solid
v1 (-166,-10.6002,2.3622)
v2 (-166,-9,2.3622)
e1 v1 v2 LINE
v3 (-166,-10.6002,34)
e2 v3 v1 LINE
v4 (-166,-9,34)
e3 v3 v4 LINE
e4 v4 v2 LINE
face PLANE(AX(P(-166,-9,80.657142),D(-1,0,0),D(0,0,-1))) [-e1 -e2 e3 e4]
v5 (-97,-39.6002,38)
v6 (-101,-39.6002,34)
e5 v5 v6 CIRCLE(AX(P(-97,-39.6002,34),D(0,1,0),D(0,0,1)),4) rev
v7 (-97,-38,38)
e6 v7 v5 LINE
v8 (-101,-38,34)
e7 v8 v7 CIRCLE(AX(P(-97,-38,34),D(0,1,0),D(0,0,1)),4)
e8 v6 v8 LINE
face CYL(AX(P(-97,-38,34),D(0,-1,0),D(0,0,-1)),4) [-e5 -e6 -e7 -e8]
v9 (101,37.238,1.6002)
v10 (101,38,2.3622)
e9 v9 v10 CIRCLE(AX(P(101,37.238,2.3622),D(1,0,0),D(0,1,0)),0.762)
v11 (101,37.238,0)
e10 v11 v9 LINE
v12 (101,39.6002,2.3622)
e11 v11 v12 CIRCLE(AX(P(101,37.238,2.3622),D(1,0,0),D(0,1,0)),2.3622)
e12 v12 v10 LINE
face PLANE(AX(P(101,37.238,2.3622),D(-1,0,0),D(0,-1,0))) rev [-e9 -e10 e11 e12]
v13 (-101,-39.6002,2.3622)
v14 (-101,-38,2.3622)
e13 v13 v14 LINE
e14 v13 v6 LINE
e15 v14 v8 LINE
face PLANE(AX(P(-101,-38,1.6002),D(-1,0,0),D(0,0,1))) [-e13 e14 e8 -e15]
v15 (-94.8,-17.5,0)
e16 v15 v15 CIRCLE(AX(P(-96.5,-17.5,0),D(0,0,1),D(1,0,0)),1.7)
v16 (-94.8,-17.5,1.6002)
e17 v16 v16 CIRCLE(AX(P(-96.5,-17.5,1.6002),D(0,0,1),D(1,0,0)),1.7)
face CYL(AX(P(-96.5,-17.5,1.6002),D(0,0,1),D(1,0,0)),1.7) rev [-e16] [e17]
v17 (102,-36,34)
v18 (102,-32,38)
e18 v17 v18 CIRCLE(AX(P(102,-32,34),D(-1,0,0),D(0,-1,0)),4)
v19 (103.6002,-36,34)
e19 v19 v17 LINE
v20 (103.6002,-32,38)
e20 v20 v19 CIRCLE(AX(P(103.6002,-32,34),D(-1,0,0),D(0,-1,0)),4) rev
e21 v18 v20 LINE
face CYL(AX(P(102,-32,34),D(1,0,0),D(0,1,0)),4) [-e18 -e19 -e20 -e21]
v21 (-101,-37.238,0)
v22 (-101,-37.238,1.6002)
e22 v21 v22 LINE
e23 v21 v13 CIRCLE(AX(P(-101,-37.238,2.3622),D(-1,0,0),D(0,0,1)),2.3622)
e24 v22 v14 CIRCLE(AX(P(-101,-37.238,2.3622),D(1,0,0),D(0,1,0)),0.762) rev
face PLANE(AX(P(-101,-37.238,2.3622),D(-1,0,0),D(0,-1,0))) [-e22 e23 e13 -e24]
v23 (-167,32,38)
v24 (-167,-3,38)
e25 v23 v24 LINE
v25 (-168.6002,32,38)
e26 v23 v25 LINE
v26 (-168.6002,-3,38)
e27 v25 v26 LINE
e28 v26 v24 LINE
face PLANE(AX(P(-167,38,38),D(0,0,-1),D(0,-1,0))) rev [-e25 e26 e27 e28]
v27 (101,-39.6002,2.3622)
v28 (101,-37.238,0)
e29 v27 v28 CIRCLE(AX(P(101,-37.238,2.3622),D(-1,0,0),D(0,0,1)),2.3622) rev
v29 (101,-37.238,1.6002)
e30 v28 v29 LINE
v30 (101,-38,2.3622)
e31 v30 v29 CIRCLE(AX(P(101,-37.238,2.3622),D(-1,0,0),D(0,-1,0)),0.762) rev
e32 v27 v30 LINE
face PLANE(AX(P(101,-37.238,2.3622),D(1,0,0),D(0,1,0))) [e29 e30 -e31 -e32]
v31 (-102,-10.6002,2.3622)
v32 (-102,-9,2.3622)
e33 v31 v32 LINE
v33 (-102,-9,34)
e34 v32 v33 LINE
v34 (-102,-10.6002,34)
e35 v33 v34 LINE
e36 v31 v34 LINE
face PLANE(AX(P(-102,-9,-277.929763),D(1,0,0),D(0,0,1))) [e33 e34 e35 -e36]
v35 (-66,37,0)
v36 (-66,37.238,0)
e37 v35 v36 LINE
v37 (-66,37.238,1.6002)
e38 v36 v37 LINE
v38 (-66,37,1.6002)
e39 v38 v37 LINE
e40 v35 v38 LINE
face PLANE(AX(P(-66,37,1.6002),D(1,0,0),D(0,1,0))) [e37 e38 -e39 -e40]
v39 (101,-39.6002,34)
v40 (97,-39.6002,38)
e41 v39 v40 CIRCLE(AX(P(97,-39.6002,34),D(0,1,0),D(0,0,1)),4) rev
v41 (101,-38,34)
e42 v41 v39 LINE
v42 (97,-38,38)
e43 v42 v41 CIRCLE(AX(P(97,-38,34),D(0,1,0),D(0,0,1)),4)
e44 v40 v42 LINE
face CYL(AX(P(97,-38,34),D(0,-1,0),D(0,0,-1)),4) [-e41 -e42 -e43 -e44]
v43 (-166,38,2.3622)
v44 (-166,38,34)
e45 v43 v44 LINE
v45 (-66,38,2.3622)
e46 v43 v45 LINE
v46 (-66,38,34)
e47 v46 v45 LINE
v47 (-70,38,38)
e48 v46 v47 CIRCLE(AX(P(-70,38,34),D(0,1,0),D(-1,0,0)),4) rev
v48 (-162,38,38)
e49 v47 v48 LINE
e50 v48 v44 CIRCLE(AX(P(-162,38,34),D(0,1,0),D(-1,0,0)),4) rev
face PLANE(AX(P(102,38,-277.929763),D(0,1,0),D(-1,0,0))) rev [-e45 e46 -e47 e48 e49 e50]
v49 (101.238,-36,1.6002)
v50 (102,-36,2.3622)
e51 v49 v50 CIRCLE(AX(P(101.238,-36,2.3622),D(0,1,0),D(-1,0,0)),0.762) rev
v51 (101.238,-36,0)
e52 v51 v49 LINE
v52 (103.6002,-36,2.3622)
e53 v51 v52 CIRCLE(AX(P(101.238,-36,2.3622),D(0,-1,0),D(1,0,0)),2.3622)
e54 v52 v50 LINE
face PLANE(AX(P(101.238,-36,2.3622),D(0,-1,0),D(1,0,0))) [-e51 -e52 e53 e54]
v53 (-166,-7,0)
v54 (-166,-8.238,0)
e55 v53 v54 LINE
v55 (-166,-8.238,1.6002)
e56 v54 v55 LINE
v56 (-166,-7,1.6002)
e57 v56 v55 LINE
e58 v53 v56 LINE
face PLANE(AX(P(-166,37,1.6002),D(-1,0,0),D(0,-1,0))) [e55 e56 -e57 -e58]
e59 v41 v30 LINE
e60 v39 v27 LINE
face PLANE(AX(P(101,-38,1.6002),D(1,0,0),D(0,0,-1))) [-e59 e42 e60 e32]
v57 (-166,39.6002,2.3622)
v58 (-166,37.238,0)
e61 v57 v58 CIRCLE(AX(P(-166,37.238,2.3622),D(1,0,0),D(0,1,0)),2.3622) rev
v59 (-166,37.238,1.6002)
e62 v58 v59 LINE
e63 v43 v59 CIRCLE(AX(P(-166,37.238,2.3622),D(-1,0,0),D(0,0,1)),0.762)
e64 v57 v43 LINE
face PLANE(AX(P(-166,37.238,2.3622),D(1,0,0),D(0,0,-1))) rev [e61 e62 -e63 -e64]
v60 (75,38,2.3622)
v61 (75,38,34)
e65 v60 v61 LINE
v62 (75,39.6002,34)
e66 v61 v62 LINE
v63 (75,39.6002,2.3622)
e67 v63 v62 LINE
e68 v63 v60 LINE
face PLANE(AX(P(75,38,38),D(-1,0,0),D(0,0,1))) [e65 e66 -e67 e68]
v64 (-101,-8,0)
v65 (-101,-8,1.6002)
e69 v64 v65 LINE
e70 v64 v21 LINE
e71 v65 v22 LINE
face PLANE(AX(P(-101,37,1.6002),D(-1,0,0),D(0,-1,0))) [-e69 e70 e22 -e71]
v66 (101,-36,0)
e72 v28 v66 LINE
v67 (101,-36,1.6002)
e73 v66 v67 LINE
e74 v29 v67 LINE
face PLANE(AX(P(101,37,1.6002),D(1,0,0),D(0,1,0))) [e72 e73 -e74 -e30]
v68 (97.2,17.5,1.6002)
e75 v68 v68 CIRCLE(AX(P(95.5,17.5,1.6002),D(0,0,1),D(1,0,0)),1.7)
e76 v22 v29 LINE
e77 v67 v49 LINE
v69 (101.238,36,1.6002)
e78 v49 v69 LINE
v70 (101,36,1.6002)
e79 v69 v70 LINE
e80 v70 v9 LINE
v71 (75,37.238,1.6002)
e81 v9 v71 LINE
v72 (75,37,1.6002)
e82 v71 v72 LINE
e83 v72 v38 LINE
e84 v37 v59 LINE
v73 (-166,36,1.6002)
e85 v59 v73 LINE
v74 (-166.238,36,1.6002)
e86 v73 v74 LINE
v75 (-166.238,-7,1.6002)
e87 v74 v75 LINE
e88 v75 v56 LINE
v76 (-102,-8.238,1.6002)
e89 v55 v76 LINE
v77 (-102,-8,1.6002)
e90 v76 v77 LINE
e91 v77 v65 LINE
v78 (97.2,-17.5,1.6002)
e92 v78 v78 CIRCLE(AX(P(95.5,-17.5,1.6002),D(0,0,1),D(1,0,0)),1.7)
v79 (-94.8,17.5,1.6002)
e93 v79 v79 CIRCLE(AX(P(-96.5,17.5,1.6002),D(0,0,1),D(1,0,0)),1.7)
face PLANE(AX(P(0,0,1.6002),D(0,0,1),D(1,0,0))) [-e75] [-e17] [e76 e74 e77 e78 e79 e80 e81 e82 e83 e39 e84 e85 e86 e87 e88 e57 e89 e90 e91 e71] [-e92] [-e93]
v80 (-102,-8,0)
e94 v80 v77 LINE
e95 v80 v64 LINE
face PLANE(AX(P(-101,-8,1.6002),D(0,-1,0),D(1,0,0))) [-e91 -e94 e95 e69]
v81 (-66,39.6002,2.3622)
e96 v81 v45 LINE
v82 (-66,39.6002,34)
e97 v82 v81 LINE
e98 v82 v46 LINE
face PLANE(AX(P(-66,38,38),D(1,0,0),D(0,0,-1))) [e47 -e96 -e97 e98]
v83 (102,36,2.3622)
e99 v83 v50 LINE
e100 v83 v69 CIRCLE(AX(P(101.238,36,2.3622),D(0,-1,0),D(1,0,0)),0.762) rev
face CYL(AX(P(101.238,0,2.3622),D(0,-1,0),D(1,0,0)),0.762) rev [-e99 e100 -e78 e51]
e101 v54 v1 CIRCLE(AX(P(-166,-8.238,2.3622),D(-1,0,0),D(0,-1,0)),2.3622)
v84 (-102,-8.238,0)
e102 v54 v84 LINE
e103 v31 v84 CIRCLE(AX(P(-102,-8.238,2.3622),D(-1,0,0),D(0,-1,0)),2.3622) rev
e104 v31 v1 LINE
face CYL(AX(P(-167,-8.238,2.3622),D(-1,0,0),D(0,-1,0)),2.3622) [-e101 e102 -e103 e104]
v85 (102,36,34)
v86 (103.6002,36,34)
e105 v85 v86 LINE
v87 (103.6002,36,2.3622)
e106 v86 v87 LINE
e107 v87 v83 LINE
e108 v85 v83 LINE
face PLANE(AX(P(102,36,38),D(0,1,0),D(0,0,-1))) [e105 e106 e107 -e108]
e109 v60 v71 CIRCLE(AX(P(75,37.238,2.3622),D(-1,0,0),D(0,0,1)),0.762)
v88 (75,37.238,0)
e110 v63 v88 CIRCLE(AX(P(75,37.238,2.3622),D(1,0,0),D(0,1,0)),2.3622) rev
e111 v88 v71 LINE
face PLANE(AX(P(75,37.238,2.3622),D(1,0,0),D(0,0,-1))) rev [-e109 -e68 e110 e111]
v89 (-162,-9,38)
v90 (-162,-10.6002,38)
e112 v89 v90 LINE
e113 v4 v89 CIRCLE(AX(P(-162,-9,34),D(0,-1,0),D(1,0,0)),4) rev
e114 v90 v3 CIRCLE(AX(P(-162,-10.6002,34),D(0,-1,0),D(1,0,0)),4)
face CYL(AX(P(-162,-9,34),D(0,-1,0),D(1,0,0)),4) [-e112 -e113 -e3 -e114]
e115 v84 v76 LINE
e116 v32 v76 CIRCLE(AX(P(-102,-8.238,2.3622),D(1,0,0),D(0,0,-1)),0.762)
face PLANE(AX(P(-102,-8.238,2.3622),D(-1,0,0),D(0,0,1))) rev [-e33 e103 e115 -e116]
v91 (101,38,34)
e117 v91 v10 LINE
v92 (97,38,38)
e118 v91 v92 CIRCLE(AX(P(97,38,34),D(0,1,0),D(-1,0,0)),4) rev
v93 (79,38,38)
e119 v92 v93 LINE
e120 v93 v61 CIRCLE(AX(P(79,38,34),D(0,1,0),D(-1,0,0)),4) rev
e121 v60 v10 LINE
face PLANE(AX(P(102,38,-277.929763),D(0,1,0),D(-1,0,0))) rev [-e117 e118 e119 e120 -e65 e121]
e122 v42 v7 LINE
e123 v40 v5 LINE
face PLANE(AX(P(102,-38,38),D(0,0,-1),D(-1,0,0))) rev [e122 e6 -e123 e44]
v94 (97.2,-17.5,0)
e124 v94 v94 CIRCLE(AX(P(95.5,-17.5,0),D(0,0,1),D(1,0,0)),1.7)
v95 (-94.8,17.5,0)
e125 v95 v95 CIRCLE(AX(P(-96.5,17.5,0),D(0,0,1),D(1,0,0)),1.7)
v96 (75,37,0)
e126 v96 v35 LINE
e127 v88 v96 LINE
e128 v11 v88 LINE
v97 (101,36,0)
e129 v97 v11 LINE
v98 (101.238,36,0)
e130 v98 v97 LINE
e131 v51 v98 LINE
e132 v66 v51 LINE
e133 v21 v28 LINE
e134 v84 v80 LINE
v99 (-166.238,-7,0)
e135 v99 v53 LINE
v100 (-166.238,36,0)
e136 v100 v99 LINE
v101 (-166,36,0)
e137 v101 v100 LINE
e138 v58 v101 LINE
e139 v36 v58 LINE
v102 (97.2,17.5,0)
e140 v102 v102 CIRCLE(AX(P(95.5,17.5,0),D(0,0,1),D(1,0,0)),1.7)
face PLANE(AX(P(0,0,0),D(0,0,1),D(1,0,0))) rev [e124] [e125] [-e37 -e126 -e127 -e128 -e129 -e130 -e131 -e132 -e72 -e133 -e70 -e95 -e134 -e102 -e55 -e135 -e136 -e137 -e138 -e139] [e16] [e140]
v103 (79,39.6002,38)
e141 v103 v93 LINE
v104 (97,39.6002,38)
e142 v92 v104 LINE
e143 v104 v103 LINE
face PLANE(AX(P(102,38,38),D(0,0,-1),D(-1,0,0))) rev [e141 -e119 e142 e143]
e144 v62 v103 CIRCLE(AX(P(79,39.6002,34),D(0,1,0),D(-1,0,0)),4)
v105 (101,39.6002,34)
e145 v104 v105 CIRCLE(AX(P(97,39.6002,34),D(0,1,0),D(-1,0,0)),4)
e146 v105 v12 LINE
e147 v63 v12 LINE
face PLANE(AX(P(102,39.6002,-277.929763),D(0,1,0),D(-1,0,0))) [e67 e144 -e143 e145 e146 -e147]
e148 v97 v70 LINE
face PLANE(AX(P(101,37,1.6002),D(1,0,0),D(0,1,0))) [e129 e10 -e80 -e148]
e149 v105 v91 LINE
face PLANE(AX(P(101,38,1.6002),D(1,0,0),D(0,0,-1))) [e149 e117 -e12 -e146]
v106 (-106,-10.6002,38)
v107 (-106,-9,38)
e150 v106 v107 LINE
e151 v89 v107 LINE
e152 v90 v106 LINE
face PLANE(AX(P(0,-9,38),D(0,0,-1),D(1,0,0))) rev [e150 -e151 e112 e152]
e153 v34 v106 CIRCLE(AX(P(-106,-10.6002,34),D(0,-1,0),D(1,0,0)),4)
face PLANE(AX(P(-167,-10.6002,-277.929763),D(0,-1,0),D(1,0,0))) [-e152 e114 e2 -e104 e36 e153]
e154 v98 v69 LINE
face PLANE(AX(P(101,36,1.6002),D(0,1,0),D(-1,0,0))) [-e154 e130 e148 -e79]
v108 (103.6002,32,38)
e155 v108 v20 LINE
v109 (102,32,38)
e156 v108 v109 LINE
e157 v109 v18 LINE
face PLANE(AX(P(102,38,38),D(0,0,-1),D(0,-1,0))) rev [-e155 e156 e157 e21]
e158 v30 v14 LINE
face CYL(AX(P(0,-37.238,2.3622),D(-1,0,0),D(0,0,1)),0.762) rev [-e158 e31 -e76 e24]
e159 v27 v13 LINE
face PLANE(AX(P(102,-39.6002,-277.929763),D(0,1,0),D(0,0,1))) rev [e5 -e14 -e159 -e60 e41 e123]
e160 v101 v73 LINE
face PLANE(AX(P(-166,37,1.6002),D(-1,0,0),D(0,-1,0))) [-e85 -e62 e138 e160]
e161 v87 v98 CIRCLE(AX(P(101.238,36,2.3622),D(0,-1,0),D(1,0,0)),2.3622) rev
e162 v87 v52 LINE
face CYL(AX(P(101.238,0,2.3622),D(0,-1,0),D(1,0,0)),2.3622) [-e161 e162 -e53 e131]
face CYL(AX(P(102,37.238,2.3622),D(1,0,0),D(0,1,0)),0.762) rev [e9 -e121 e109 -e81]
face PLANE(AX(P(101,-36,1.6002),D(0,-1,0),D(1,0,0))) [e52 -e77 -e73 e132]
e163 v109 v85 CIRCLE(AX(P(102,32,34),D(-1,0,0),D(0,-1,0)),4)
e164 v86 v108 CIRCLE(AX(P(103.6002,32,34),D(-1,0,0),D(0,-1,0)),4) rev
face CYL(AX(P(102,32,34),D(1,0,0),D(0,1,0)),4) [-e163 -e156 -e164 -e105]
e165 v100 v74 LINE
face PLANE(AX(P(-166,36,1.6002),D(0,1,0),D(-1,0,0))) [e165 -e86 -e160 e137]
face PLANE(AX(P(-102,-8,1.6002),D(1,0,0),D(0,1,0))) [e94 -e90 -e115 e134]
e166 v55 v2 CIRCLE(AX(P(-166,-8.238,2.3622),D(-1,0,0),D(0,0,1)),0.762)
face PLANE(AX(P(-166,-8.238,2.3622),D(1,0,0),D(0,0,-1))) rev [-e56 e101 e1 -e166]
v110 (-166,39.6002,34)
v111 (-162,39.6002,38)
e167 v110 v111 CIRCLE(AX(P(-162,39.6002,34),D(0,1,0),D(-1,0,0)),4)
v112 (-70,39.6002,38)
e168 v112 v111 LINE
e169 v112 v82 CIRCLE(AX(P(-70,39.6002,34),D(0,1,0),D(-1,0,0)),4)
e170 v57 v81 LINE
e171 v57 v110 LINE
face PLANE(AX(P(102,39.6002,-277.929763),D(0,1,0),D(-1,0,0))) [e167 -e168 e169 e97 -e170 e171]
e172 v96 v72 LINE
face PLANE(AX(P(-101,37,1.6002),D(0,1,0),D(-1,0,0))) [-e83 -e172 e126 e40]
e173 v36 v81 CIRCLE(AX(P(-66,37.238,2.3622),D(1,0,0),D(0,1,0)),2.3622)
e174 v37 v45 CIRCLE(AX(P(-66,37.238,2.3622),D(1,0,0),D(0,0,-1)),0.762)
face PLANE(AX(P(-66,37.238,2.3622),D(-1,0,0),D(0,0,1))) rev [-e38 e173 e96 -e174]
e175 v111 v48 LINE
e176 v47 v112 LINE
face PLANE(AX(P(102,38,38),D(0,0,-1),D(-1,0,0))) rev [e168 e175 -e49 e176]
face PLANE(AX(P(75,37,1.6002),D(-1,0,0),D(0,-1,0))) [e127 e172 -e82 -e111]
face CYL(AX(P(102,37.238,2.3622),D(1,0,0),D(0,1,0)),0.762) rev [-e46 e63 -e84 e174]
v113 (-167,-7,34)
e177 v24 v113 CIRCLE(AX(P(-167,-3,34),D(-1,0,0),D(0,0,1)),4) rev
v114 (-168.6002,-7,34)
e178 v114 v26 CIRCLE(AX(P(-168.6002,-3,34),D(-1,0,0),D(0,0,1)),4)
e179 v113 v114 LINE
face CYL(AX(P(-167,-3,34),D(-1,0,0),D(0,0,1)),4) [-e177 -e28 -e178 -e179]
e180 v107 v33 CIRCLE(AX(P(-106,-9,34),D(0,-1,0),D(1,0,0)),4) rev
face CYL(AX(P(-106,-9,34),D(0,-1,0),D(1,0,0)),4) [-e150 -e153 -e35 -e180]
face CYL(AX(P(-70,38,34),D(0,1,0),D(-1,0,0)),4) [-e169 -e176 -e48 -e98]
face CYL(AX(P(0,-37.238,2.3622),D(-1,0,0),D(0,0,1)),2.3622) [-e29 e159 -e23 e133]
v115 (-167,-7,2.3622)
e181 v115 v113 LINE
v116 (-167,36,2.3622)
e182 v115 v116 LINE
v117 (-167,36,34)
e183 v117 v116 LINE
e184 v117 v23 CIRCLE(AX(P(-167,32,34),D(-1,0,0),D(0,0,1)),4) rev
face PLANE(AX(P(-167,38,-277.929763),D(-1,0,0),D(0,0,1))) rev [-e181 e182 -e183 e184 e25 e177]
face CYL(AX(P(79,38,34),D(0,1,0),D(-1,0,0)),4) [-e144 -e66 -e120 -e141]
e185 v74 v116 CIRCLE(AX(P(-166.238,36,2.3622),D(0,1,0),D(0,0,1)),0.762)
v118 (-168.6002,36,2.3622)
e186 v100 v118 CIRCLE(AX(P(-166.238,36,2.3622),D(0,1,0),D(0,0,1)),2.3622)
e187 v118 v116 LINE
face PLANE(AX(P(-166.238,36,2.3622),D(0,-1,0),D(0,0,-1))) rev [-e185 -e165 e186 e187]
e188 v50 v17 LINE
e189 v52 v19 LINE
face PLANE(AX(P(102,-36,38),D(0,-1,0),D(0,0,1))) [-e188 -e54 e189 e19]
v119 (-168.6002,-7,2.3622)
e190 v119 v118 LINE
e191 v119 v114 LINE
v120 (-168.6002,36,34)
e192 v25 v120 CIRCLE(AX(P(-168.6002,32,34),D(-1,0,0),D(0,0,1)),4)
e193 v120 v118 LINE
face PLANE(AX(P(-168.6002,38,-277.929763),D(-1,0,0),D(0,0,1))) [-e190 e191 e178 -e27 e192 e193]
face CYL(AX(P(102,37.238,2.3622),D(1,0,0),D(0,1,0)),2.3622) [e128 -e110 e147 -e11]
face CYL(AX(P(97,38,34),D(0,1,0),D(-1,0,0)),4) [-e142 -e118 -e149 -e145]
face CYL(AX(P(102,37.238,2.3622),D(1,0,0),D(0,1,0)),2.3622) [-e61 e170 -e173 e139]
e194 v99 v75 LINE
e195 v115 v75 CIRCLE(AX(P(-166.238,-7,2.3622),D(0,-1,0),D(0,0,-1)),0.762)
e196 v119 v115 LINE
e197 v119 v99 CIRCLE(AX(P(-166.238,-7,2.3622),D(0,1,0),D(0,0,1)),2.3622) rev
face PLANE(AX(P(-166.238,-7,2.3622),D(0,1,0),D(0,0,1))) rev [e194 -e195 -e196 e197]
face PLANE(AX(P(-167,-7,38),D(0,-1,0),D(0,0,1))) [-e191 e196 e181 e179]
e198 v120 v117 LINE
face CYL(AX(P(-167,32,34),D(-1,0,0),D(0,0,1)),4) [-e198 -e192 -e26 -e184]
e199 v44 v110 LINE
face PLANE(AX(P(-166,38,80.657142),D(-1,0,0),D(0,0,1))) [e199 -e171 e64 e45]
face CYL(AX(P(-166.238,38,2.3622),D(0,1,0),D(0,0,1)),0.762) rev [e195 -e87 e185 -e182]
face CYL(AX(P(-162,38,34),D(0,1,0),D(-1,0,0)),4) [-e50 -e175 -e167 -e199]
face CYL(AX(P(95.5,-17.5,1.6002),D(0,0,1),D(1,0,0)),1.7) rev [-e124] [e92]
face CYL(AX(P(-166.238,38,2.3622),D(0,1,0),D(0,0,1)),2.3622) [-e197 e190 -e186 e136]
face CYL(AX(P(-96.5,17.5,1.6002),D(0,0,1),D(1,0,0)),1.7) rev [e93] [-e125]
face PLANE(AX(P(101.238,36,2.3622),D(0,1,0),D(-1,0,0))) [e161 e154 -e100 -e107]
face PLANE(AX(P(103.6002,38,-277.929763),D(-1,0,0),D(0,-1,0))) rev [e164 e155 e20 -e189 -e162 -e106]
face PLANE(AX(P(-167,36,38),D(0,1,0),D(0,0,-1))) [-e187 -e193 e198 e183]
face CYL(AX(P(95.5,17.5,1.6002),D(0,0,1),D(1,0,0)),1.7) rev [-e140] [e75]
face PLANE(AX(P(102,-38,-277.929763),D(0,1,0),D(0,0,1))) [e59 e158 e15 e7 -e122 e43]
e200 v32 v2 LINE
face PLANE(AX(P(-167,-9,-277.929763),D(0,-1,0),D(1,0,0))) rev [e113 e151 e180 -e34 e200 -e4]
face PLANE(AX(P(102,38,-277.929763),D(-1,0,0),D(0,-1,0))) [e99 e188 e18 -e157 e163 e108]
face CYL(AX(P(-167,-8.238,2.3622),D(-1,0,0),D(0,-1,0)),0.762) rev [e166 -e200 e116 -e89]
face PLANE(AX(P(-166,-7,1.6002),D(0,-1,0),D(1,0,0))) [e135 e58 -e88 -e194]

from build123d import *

# Parameters (mm, degrees)
SKETCH1_W              = 202
SKETCH1_H              = 74
BOSS_EXTRUDE1_DEPTH    = 1.6002
M3_CLEARANCE_HOLE1_D   = 3.4
SKETCH3_W              = 202
SKETCH3_H              = 2.5875
BOSS_EXTRUDE2_DEPTH    = 38
SKETCH6_W              = 35
SKETCH6_H              = 2.5875
SKETCH6_W_2            = 26
BOSS_EXTRUDE3_DEPTH    = 38
SKETCH7_W              = 2.5875
SKETCH7_H              = 72
BOSS_EXTRUDE4_DEPTH    = 38
SKETCH8_W              = 65
SKETCH8_H              = 45
BOSS_EXTRUDE5_DEPTH    = 1.6002
SKETCH9_W              = 65
SKETCH9_H              = 38
BOSS_EXTRUDE6_DEPTH    = 2.5875
SKETCH10_W             = 2.5875
SKETCH10_H             = 43
SKETCH10_W_2           = 64
SKETCH10_H_2           = 2.5875
BOSS_EXTRUDE7_DEPTH    = 38
CUT_EXTRUDE1_DEPTH     = 36.3998
CONVERT_SOLID1_START   = -101
CONVERT_SOLID1_DEPTH   = 202
CONVERT_SOLID1_START_2 = -166
CONVERT_SOLID1_2_DEPTH = 64
CONVERT_SOLID1_START_3 = -102
CONVERT_SOLID1_3_DEPTH = 36
CONVERT_SOLID1_START_4 = 75
CONVERT_SOLID1_4_DEPTH = 26
CONVERT_SOLID1_START_5 = -7
CONVERT_SOLID1_5_DEPTH = 43
CONVERT_SOLID1_START_6 = -36
CONVERT_SOLID1_6_DEPTH = 29
CONVERT_SOLID1_7_DEPTH = 267
CONVERT_SOLID1_8_DEPTH = 64
CONVERT_SOLID1_9_DEPTH = 72
FILLET1_R              = 4


# Read off the part's stored shape, not the designer's step: Convert-Solid1
with BuildPart() as part:
    # Sketch1 → Boss-Extrude1 (new body)
    with BuildSketch(Plane.XY):
        Rectangle(SKETCH1_W, SKETCH1_H)
    extrude(amount=BOSS_EXTRUDE1_DEPTH)

    # M3 Clearance Hole1 (through all)
    with Locations(Plane.XY.offset(1.6002)):
        with Locations((-96.5, 17.5), (95.5, -17.5), (-96.5, -17.5), (95.5, 17.5)):
            Hole(M3_CLEARANCE_HOLE1_D / 2)

    # Sketch3 → Boss-Extrude2 (add)
    with BuildSketch(Plane.XY):
        with Locations((0, -38.29375)):
            Rectangle(SKETCH3_W, SKETCH3_H)
    extrude(amount=BOSS_EXTRUDE2_DEPTH)

    # Sketch6 → Boss-Extrude3 (add)
    with BuildSketch(Plane.XY):
        with Locations((-83.5, 38.29375)):
            Rectangle(SKETCH6_W, SKETCH6_H)
        with Locations((88, 38.29375)):
            Rectangle(SKETCH6_W_2, SKETCH6_H)
    extrude(amount=BOSS_EXTRUDE3_DEPTH)

    # Sketch7 → Boss-Extrude4 (add)
    with BuildSketch(Plane.XY):
        with Locations((102.29375, 0)):
            Rectangle(SKETCH7_W, SKETCH7_H)
    extrude(amount=BOSS_EXTRUDE4_DEPTH)

    # Sketch8 → Boss-Extrude5 (add)
    with BuildSketch(Plane.XY):
        with Locations((-133.5, 14.5)):
            Rectangle(SKETCH8_W, SKETCH8_H)
    extrude(amount=BOSS_EXTRUDE5_DEPTH)

    # Sketch9 → Boss-Extrude6 (add)
    with BuildSketch(Plane(origin=(0, 37, 0), x_dir=(1, 0, 0), z_dir=(0, 1, 0))):
        with Locations((-133.5, -19)):
            Rectangle(SKETCH9_W, SKETCH9_H)
    extrude(amount=BOSS_EXTRUDE6_DEPTH)

    # Sketch10 → Boss-Extrude7 (add)
    with BuildSketch(Plane.XY):
        with Locations((-167.29375, 14.5)):
            Rectangle(SKETCH10_W, SKETCH10_H)
        with Locations((-134, -9.29375)):
            Rectangle(SKETCH10_W_2, SKETCH10_H_2)
    extrude(amount=BOSS_EXTRUDE7_DEPTH)

    # Sketch15 → Cut-Extrude1 (cut)
    with BuildSketch(Plane.XY.offset(38)):
        Polygon((102, 38), (-167, 38), (-167, -9), (-102, -9), (-102, -38), (102, -38), align=None)
    extrude(amount=-CUT_EXTRUDE1_DEPTH, mode=Mode.SUBTRACT)

    # Convert-Solid1 outline → Convert-Solid1 (add)
    with BuildSketch(Plane.YZ.offset(CONVERT_SOLID1_START)):
        with BuildLine():
            Line((-38, 1.6002), (-37.238, 1.6002))
            ThreePointArc((-37.238, 1.6002), (-37.776815367, 1.823384633), (-38, 2.3622))
            Line((-38, 2.3622), (-38, 1.6002))
        make_face()
        with BuildLine():
            Line((-39.5875, 2.117580723), (-39.5875, 38))
            Line((-39.5875, 38), (-39.6002, 38))
            Line((-39.6002, 38), (-39.6002, 2.3622))
            ThreePointArc((-39.6002, 2.3622), (-39.597022863, 2.239725635), (-39.5875, 2.117580723))
        make_face()
    extrude(amount=CONVERT_SOLID1_DEPTH)

    # Convert-Solid1 2 outline → Convert-Solid1 2 (add)
    with BuildSketch(Plane.YZ.offset(CONVERT_SOLID1_START_2)):
        with BuildLine():
            ThreePointArc((-10.6002, 2.3622), (-10.597022863, 2.239725635), (-10.5875, 2.117580723))
            Line((-10.5875, 2.117580723), (-10.5875, 38))
            Line((-10.5875, 38), (-10.6002, 38))
            Line((-10.6002, 38), (-10.6002, 2.3622))
        make_face()
        with BuildLine():
            Line((-9, 2.3622), (-9, 1.6002))
            Line((-9, 1.6002), (-8.238, 1.6002))
            ThreePointArc((-8.238, 1.6002), (-8.776815367, 1.823384633), (-9, 2.3622))
        make_face()
        with BuildLine():
            ThreePointArc((38, 2.3622), (37.776815367, 1.823384633), (37.238, 1.6002))
            Line((37.238, 1.6002), (38, 1.6002))
            Line((38, 1.6002), (38, 2.3622))
        make_face()
        with BuildLine():
            Line((39.5875, 38), (39.5875, 2.117580723))
            ThreePointArc((39.5875, 2.117580723), (39.597022863, 2.239725635), (39.6002, 2.3622))
            Line((39.6002, 2.3622), (39.6002, 38))
            Line((39.6002, 38), (39.5875, 38))
        make_face()
    extrude(amount=CONVERT_SOLID1_2_DEPTH)

    # Convert-Solid1 3 outline → Convert-Solid1 3 (add)
    with BuildSketch(Plane.YZ.offset(CONVERT_SOLID1_START_3)):
        with BuildLine():
            ThreePointArc((38, 2.3622), (37.776815367, 1.823384633), (37.238, 1.6002))
            Line((37.238, 1.6002), (38, 1.6002))
            Line((38, 1.6002), (38, 2.3622))
        make_face()
        with BuildLine():
            Line((39.5875, 38), (39.5875, 2.117580723))
            ThreePointArc((39.5875, 2.117580723), (39.597022863, 2.239725635), (39.6002, 2.3622))
            Line((39.6002, 2.3622), (39.6002, 38))
            Line((39.6002, 38), (39.5875, 38))
        make_face()
    extrude(amount=CONVERT_SOLID1_3_DEPTH)

    # Convert-Solid1 4 outline → Convert-Solid1 4 (add)
    with BuildSketch(Plane.YZ.offset(CONVERT_SOLID1_START_4)):
        with BuildLine():
            ThreePointArc((38, 2.3622), (37.776815367, 1.823384633), (37.238, 1.6002))
            Line((37.238, 1.6002), (38, 1.6002))
            Line((38, 1.6002), (38, 2.3622))
        make_face()
        with BuildLine():
            Line((39.5875, 38), (39.5875, 2.117580723))
            ThreePointArc((39.5875, 2.117580723), (39.597022863, 2.239725635), (39.6002, 2.3622))
            Line((39.6002, 2.3622), (39.6002, 38))
            Line((39.6002, 38), (39.5875, 38))
        make_face()
    extrude(amount=CONVERT_SOLID1_4_DEPTH)

    # Convert-Solid1 5 outline → Convert-Solid1 5 (add)
    with BuildSketch(Plane(origin=(0, 0, 0), x_dir=(1, 0, 0), z_dir=(0, 1, 0)).offset(CONVERT_SOLID1_START_5)):
        with BuildLine():
            ThreePointArc((-167, -2.3622), (-166.776815367, -1.823384633), (-166.238, -1.6002))
            Line((-166.238, -1.6002), (-167, -1.6002))
            Line((-167, -1.6002), (-167, -2.3622))
        make_face()
        with BuildLine():
            Line((102, -1.6002), (101.238, -1.6002))
            ThreePointArc((101.238, -1.6002), (101.776815367, -1.823384633), (102, -2.3622))
            Line((102, -2.3622), (102, -1.6002))
        make_face()
        with BuildLine():
            Line((-168.6002, -38), (-168.5875, -38))
            Line((-168.5875, -38), (-168.5875, -2.117580723))
            ThreePointArc((-168.5875, -2.117580723), (-168.597022863, -2.239725635), (-168.6002, -2.3622))
            Line((-168.6002, -2.3622), (-168.6002, -38))
        make_face()
        with BuildLine():
            Line((103.5875, -2.117580723), (103.5875, -38))
            Line((103.5875, -38), (103.6002, -38))
            Line((103.6002, -38), (103.6002, -2.3622))
            ThreePointArc((103.6002, -2.3622), (103.597022863, -2.239725635), (103.5875, -2.117580723))
        make_face()
    extrude(amount=CONVERT_SOLID1_5_DEPTH)

    # Convert-Solid1 6 outline → Convert-Solid1 6 (add)
    with BuildSketch(Plane(origin=(0, 0, 0), x_dir=(1, 0, 0), z_dir=(0, 1, 0)).offset(CONVERT_SOLID1_START_6)):
        with BuildLine():
            Line((102, -1.6002), (101.238, -1.6002))
            ThreePointArc((101.238, -1.6002), (101.776815367, -1.823384633), (102, -2.3622))
            Line((102, -2.3622), (102, -1.6002))
        make_face()
        with BuildLine():
            Line((103.5875, -2.117580723), (103.5875, -38))
            Line((103.5875, -38), (103.6002, -38))
            Line((103.6002, -38), (103.6002, -2.3622))
            ThreePointArc((103.6002, -2.3622), (103.597022863, -2.239725635), (103.5875, -2.117580723))
        make_face()
    extrude(amount=CONVERT_SOLID1_6_DEPTH)

    # Convert-Solid1 7 outline → Convert-Solid1 7 (cut)
    with BuildSketch(Plane.YZ.offset(CONVERT_SOLID1_START_2)):
        with BuildLine():
            Line((-10.5875, 2.117580723), (-10.5875, 1.6002))
            Line((-10.5875, 1.6002), (-10.473921475, 1.6002))
            ThreePointArc((-10.473921475, 1.6002), (-10.545258813, 1.855696681), (-10.5875, 2.117580723))
        make_face()
        with BuildLine():
            Line((-39.5875, 0), (-37.238, 0))
            ThreePointArc((-37.238, 0), (-38.81947861, 0.607516482), (-39.5875, 2.117580723))
            Line((-39.5875, 2.117580723), (-39.5875, 0))
        make_face()
        with BuildLine():
            ThreePointArc((39.5875, 2.117580723), (38.81947861, 0.607516482), (37.238, 0))
            Line((37.238, 0), (39.5875, 0))
            Line((39.5875, 0), (39.5875, 2.117580723))
        make_face()
    extrude(amount=CONVERT_SOLID1_7_DEPTH, mode=Mode.SUBTRACT)

    # Convert-Solid1 8 outline → Convert-Solid1 8 (cut)
    with BuildSketch(Plane.YZ.offset(CONVERT_SOLID1_START_2)):
        with BuildLine():
            Line((-10.473921475, 1.6002), (-10.5875, 1.6002))
            Line((-10.5875, 1.6002), (-10.5875, 0))
            Line((-10.5875, 0), (-8.238, 0))
            ThreePointArc((-8.238, 0), (-9.612771334, 0.441264649), (-10.473921475, 1.6002))
        make_face()
    extrude(amount=CONVERT_SOLID1_8_DEPTH, mode=Mode.SUBTRACT)

    # Convert-Solid1 9 outline → Convert-Solid1 9 (cut)
    with BuildSketch(Plane(origin=(0, 0, 0), x_dir=(1, 0, 0), z_dir=(0, 1, 0)).offset(CONVERT_SOLID1_START_6)):
        with BuildLine():
            Line((-168.5875, 0), (-168.5875, -2.117580723))
            ThreePointArc((-168.5875, -2.117580723), (-167.81947861, -0.607516482), (-166.238, 0))
            Line((-166.238, 0), (-168.5875, 0))
        make_face()
        with BuildLine():
            ThreePointArc((101.238, 0), (102.81947861, -0.607516482), (103.5875, -2.117580723))
            Line((103.5875, -2.117580723), (103.5875, 0))
            Line((103.5875, 0), (101.238, 0))
        make_face()
    extrude(amount=CONVERT_SOLID1_9_DEPTH, mode=Mode.SUBTRACT)

    # Fillet1
    fillet1_edges = [part.edges().sort_by_distance(p)[0] for p in [
        (75, 38.8001, 38),
        (101, 38.8001, 38),
        (102.8001, 36, 38),
        (102.8001, -36, 38),
        (101, -38.8001, 38),
        (-101, -38.8001, 38),
        (-102, -9.8001, 38),
        (-166, -9.8001, 38),
        (-167.8001, -7, 38),
        (-167.8001, 36, 38),
        (-166, 38.8001, 38),
        (-66, 38.8001, 38),
    ]]
    fillet(fillet1_edges, radius=FILLET1_R)


solid = part.part
